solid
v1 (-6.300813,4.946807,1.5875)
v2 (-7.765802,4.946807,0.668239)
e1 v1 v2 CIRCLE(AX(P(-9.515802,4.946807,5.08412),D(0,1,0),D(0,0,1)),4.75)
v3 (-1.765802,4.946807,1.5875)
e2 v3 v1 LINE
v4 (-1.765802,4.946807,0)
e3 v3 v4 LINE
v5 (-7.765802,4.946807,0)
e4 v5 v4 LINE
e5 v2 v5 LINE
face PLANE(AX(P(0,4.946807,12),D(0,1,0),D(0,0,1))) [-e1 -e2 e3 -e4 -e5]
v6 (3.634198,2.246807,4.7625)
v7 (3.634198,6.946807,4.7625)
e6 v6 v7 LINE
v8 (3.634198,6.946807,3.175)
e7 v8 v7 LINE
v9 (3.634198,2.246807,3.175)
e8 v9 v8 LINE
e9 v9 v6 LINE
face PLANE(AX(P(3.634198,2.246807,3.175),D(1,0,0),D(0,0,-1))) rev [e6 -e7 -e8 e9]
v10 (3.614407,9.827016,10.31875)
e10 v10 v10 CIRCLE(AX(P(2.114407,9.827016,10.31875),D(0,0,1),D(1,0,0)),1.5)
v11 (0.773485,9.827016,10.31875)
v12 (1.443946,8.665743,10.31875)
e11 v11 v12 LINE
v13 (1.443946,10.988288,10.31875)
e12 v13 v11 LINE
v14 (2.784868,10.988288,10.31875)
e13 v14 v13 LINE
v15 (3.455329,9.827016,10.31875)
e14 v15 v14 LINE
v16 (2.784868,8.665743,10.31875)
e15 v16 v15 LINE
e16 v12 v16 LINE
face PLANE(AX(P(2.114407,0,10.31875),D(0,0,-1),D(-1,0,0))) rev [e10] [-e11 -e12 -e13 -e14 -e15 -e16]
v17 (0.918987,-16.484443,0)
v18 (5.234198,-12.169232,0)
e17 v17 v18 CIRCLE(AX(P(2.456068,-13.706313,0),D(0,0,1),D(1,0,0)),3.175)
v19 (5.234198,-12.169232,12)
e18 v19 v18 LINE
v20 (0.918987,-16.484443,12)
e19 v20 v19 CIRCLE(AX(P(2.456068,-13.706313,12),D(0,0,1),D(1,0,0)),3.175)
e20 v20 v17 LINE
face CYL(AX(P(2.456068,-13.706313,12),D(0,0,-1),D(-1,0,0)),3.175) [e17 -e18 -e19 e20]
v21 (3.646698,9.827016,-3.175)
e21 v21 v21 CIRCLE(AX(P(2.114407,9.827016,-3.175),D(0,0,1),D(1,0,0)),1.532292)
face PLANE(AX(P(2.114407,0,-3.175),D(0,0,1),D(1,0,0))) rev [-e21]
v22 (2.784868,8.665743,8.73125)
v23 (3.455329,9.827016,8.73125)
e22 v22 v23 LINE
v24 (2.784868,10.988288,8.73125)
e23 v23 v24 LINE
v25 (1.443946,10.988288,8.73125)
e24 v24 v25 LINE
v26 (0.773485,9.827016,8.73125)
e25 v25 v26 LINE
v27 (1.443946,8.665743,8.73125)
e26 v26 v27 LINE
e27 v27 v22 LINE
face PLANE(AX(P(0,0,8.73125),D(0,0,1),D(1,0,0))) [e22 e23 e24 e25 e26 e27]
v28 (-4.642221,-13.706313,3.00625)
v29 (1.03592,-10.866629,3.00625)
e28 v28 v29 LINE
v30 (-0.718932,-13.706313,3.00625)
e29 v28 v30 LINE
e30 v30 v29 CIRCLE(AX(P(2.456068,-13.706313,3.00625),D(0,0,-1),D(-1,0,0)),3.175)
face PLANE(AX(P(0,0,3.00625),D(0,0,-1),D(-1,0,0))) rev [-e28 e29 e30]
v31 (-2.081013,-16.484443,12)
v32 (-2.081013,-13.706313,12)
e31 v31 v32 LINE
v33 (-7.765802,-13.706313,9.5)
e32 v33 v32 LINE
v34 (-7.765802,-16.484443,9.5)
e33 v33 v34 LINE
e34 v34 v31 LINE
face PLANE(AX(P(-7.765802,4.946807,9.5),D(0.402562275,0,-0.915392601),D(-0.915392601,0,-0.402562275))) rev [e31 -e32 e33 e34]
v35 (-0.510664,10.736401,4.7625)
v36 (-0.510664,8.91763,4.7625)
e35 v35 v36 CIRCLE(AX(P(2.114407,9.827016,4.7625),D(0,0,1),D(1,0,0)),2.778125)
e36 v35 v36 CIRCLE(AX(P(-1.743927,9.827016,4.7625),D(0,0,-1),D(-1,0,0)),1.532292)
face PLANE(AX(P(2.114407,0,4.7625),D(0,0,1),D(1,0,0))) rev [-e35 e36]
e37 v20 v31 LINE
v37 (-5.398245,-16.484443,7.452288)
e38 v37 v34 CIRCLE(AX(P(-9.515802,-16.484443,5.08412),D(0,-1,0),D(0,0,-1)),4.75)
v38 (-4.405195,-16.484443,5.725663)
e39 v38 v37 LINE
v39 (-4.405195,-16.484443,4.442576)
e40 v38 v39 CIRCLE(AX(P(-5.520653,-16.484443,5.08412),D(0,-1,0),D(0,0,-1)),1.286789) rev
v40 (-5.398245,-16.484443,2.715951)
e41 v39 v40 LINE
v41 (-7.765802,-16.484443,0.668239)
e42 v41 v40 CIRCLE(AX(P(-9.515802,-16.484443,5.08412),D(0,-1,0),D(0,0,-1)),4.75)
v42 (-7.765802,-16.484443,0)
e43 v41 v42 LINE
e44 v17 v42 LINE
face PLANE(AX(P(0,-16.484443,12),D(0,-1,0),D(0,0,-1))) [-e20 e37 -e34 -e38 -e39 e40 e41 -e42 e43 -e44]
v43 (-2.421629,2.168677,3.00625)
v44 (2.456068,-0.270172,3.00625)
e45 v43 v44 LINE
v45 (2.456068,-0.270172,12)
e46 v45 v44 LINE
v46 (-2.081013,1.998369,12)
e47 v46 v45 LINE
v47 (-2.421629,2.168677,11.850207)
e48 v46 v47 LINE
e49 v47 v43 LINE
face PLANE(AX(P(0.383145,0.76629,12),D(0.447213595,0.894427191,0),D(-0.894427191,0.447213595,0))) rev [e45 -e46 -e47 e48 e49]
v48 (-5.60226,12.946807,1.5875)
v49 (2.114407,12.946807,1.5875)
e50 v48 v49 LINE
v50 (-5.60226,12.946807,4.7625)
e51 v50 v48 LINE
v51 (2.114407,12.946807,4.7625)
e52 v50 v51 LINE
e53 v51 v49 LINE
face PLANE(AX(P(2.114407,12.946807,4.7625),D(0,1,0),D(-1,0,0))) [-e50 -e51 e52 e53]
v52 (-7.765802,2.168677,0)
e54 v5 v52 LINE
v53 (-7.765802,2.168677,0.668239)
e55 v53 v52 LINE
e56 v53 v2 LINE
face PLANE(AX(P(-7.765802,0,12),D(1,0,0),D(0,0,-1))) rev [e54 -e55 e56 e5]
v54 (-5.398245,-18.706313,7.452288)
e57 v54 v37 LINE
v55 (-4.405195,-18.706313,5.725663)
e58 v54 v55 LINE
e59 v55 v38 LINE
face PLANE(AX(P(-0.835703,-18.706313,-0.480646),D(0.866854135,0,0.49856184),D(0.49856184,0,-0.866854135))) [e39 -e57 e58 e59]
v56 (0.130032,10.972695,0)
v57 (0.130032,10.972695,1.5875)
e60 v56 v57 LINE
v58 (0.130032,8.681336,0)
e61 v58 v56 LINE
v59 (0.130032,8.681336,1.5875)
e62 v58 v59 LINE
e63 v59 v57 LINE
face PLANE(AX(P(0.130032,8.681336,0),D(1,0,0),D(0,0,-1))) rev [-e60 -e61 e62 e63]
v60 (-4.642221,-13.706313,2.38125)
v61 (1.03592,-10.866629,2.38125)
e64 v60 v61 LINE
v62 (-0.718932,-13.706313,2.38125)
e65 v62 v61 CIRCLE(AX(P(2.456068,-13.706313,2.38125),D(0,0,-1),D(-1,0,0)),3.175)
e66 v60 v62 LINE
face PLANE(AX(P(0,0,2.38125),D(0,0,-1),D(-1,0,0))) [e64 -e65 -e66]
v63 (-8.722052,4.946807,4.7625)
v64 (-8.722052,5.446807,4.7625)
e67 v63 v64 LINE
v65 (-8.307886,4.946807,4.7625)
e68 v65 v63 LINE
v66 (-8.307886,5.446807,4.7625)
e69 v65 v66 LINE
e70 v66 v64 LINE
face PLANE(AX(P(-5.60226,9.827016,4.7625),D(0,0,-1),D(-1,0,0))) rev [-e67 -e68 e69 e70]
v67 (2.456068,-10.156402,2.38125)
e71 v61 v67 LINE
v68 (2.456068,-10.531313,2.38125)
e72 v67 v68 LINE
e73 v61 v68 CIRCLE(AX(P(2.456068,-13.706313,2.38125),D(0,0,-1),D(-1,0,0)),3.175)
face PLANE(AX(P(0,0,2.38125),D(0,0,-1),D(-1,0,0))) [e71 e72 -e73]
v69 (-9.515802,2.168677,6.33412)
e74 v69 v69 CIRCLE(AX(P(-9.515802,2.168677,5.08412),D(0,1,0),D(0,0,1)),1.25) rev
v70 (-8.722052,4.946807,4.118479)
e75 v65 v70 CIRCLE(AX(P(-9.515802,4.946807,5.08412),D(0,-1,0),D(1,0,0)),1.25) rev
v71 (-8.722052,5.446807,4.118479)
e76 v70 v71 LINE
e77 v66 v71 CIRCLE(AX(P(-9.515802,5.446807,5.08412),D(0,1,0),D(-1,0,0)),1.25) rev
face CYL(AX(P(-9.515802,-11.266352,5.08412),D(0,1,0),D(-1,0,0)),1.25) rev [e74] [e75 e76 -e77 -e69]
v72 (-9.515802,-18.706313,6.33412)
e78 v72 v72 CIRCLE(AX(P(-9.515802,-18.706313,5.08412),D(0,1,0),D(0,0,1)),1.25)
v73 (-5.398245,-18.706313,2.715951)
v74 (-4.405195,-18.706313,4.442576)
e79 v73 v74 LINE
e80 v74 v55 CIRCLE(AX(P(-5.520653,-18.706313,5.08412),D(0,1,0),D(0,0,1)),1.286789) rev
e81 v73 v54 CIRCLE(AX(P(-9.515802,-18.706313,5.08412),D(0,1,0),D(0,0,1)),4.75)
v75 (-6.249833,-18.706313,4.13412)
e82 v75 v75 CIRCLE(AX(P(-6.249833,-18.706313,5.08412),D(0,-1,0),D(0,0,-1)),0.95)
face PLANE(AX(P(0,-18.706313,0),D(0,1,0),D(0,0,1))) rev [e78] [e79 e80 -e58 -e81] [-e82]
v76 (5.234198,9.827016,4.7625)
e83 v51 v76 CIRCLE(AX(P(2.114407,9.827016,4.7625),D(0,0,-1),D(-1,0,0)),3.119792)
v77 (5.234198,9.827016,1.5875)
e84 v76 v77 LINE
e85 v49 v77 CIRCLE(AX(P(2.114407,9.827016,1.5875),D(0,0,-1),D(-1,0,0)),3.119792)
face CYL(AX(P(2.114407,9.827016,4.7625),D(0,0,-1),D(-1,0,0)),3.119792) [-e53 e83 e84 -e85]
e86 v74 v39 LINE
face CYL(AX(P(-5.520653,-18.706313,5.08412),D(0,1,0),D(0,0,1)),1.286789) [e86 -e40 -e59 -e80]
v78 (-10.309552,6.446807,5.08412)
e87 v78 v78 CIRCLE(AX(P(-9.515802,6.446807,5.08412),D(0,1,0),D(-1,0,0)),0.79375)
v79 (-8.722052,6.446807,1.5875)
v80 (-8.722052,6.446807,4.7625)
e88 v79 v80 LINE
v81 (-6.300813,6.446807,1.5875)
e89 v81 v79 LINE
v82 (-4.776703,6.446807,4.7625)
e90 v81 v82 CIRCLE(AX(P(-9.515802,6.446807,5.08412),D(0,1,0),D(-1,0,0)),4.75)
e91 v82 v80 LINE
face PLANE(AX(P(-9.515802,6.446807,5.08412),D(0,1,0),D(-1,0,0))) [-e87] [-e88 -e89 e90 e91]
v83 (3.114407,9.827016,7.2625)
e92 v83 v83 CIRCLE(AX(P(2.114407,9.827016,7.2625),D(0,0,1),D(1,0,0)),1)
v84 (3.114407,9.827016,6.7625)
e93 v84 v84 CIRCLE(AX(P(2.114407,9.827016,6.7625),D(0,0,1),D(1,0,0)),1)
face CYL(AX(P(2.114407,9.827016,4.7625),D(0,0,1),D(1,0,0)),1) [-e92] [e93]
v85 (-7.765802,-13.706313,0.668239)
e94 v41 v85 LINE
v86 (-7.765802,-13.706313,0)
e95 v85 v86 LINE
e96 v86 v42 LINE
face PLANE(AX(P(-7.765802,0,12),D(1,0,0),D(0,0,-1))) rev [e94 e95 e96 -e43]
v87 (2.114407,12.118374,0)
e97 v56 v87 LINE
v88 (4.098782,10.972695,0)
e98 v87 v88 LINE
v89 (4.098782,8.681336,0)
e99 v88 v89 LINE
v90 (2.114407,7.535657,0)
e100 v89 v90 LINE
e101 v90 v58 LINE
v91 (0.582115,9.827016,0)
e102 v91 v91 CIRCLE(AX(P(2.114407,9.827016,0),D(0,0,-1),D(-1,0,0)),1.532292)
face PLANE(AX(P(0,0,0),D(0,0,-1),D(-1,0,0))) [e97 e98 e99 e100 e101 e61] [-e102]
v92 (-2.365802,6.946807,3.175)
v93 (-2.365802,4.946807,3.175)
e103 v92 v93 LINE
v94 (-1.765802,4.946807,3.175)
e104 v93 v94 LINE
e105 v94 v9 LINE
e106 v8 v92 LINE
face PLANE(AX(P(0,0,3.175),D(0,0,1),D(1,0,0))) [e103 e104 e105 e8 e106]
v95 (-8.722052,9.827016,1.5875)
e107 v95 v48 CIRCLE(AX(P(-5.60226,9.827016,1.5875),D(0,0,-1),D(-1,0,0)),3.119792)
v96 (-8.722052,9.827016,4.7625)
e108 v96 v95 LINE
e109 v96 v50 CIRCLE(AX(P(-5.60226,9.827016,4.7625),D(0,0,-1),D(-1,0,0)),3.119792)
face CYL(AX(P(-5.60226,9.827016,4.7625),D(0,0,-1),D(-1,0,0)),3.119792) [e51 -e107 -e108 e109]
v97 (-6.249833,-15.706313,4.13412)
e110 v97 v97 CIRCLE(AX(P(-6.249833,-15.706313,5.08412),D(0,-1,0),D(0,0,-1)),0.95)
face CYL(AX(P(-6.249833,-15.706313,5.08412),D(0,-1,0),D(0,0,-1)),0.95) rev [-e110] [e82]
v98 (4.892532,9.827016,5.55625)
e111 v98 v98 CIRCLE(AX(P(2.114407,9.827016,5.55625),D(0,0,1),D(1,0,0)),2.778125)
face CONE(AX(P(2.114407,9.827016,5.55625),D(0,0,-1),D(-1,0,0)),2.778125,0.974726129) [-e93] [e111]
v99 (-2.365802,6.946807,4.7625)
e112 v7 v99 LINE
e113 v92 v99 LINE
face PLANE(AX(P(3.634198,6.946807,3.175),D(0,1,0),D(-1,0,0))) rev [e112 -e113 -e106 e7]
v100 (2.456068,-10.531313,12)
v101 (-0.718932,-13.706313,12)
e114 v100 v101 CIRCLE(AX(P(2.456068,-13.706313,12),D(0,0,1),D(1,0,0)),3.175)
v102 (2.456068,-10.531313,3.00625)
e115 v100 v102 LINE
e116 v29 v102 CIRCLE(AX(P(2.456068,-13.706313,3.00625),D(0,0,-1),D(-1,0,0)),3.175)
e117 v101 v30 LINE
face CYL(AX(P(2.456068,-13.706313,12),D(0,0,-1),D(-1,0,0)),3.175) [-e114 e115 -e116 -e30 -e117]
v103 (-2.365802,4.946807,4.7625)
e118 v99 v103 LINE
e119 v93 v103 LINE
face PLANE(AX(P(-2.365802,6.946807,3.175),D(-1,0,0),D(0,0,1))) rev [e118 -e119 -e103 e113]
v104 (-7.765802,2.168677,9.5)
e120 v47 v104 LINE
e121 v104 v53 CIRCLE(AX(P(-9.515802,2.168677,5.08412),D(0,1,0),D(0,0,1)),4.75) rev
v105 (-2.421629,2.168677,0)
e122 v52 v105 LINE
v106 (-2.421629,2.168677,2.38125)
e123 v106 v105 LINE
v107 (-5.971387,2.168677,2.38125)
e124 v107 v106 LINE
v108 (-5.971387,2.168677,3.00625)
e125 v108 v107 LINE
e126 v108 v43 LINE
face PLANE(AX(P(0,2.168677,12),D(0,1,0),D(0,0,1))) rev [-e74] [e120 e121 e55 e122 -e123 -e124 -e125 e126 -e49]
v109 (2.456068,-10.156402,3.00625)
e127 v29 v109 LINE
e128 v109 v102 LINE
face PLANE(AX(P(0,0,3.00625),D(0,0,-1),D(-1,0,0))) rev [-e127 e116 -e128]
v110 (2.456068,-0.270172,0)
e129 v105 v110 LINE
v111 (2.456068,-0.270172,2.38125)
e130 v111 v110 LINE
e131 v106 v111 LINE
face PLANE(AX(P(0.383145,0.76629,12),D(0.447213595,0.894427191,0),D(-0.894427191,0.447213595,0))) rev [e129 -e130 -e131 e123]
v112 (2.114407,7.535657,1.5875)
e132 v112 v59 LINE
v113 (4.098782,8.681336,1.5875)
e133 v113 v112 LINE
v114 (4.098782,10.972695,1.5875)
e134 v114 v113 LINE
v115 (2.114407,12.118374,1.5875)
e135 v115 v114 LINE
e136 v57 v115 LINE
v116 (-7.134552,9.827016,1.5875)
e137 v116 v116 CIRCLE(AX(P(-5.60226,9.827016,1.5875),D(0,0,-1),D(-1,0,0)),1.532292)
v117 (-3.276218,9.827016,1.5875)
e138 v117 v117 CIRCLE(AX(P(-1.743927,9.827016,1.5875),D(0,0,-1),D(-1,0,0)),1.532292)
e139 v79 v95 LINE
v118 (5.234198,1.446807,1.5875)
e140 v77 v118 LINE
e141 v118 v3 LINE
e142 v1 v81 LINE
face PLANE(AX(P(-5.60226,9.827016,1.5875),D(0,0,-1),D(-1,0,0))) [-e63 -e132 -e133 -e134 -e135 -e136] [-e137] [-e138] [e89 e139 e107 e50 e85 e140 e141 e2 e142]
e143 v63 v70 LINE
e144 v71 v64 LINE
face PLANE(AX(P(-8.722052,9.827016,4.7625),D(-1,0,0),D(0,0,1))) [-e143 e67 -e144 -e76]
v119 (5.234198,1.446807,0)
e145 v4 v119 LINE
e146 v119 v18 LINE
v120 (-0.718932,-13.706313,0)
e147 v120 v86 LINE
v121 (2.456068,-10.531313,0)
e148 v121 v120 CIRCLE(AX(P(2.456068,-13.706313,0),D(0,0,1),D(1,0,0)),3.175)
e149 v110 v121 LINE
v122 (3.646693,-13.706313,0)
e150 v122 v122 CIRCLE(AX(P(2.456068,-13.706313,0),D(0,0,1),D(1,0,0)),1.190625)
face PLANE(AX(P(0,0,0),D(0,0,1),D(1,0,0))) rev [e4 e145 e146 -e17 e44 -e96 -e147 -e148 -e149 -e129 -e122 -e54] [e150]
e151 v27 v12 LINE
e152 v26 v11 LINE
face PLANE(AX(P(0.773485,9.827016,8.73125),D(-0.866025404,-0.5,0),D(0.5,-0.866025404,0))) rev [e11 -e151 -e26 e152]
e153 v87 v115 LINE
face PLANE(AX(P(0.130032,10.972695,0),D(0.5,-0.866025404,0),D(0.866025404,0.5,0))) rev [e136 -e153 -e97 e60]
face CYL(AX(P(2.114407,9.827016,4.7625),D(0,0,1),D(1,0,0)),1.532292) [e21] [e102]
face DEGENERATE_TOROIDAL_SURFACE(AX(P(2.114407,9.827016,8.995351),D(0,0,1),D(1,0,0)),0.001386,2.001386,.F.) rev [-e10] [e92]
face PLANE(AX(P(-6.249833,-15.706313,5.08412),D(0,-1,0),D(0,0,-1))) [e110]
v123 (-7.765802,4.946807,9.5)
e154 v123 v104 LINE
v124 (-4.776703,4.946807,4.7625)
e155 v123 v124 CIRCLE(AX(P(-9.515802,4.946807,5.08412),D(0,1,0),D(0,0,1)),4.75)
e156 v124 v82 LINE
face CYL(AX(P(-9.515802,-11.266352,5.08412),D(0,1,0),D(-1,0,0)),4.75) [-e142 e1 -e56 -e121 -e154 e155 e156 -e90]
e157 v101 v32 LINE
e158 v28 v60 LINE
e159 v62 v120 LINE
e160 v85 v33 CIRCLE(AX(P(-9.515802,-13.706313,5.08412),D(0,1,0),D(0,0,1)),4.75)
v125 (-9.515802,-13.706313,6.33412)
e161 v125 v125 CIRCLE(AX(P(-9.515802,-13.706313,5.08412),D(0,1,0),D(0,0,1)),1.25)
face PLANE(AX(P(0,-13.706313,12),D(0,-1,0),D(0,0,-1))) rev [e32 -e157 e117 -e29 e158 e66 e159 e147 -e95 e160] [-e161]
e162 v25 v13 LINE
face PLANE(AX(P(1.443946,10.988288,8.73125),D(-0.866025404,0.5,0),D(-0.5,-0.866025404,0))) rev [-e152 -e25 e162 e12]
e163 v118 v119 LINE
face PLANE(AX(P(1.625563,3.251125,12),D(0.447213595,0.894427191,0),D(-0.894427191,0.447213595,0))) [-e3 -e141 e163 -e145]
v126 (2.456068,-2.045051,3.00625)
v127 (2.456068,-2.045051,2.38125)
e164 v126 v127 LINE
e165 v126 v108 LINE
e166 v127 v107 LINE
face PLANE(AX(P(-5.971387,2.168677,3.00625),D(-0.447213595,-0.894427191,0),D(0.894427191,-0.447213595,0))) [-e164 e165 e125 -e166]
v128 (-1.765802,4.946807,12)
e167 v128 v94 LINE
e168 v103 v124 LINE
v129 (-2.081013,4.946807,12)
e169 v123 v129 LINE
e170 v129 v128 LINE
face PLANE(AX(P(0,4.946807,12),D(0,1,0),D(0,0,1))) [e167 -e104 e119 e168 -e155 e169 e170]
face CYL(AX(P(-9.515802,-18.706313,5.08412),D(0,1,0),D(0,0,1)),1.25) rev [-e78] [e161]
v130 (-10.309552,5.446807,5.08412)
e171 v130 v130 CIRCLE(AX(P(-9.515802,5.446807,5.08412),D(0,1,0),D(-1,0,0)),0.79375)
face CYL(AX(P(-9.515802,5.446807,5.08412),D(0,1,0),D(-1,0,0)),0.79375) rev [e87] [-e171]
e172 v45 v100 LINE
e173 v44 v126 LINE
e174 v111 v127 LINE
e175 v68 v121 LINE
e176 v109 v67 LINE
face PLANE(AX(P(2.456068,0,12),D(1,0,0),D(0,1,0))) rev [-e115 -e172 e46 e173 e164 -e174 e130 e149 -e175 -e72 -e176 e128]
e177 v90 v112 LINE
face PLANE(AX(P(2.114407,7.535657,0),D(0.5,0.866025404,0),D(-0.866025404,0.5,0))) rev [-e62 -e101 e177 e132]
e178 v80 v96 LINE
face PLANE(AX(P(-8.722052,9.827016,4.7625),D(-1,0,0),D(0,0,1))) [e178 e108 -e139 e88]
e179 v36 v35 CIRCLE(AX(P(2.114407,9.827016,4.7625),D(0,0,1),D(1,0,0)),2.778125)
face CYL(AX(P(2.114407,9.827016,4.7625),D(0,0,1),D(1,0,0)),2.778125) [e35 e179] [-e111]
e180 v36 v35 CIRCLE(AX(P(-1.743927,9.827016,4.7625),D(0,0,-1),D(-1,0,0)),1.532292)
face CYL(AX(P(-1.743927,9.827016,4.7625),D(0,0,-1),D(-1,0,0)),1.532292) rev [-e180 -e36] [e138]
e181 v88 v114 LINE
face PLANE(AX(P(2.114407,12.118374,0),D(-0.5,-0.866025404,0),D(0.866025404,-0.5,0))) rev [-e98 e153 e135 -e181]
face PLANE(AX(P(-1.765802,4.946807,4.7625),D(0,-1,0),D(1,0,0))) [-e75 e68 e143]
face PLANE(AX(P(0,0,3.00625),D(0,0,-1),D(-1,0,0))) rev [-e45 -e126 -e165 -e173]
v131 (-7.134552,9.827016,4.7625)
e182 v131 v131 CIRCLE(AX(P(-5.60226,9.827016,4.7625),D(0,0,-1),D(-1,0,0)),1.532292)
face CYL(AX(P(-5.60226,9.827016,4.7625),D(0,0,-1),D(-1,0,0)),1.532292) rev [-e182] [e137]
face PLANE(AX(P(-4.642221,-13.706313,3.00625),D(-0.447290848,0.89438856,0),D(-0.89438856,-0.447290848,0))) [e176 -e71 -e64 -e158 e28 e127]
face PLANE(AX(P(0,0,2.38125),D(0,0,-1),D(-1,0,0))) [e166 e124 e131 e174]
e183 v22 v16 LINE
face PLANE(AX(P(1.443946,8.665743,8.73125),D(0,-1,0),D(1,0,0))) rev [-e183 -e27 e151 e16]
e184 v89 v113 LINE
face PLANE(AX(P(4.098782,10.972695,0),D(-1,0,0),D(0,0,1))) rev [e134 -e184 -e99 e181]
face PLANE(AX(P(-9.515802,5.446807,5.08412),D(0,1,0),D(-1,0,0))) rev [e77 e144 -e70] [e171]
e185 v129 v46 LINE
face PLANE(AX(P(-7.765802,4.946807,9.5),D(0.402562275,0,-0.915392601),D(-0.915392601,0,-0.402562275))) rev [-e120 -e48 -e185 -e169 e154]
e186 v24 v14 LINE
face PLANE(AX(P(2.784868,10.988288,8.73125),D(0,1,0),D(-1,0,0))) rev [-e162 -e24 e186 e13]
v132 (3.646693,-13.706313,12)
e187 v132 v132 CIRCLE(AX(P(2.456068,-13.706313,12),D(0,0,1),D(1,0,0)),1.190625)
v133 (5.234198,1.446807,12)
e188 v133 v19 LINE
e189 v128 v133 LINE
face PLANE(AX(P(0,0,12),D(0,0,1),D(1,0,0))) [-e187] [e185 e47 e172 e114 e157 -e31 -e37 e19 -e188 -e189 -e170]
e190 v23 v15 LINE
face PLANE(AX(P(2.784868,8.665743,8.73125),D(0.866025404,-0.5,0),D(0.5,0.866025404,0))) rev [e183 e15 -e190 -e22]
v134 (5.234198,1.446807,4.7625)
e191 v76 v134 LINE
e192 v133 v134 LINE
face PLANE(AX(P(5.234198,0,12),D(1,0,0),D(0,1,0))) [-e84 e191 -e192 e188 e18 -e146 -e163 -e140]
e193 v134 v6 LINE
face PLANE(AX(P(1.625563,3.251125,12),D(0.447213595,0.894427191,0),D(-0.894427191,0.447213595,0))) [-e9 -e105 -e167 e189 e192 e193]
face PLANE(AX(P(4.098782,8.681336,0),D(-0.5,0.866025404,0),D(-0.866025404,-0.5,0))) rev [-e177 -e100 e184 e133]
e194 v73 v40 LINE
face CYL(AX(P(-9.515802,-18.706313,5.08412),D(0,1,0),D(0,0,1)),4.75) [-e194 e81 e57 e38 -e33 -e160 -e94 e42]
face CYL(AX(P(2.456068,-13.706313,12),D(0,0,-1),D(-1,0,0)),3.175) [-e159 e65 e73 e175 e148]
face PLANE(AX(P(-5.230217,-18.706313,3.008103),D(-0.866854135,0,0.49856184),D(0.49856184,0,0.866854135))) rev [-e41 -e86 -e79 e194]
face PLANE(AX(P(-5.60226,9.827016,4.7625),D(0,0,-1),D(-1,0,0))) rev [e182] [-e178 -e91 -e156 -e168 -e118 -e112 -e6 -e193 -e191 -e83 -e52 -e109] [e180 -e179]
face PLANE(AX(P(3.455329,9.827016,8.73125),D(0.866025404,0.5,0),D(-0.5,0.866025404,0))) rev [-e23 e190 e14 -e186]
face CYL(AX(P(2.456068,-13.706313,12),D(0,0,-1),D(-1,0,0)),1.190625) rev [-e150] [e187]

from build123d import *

# Parameters (mm, degrees)
BOSS_EXTRUDE1_DEPTH             = 12
CUT_EXTRUDE1_DEPTH              = 26.760554208
SKETCH4_R                       = 4.75
SKETCH4_R_2                     = 1.25
BOSS_EXTRUDE2_DEPTH             = 1.5
BOSS_EXTRUDE2_DIRECTION_2_REACH = 28.092
BOSS_EXTRUDE3_START             = -5
BOSS_EXTRUDE3_OUTLINE_R         = 1.25
BOSS_EXTRUDE3_DEPTH             = 5
SKETCH6_R                       = 0.95
CUT_EXTRUDE2_DEPTH              = 3
BOSS_EXTRUDE4_START             = -1
SKETCH8_R                       = 1.25
SKETCH8_R_2                     = 0.79375
BOSS_EXTRUDE4_DEPTH             = 1
BOSS_EXTRUDE5_DEPTH             = 0.625
SKETCH11_R                      = 1.532291667
BOSS_EXTRUDE6_DEPTH             = 3.175
CUT_EXTRUDE3_DEPTH              = 1.5875
SKETCH13_R                      = 1.532291667
BOSS_EXTRUDE7_DEPTH             = 1.5875
CUT_EXTRUDE4_DEPTH              = 1.5875


# Read off the part's stored shape, not the designer's step: Boss-Extrude3
with BuildPart() as part:
    # Sketch1 → Boss-Extrude1 (new body)
    with BuildSketch(Plane.XY):
        with BuildLine():
            Line((-1.765801731, 4.94680722), (-7.765801731, 4.94680722))
            Line((-7.765801731, 4.94680722), (-7.765801731, 2.16867722))
            Line((-7.765801731, 2.16867722), (-2.421629262, 2.16867722))
            Line((-2.421629262, 2.16867722), (2.456068269, -0.270171545))
            Line((2.456068269, -0.270171545), (2.456068269, -10.53131278))
            ThreePointArc((2.456068269, -10.53131278), (4.06858061, -10.971275495), (5.234198269, -12.169231551))
            Line((5.234198269, -12.169231551), (5.234198269, 1.44680722))
            Line((5.234198269, 1.44680722), (-1.765801731, 4.94680722))
        make_face()
        with BuildLine():
            Line((5.234198269, -15.243394008), (5.234198269, -12.169231551))
            ThreePointArc((5.234198269, -12.169231551), (4.06858061, -10.971275495), (2.456068269, -10.53131278))
            Line((2.456068269, -10.53131278), (2.456068269, -12.51568778))
            ThreePointArc((2.456068269, -12.51568778), (3.29796728, -12.864413768), (3.646693269, -13.70631278))
            ThreePointArc((3.646693269, -13.70631278), (2.456068269, -14.89693778), (1.265443269, -13.70631278))
            Line((1.265443269, -13.70631278), (-0.718931731, -13.70631278))
            ThreePointArc((-0.718931731, -13.70631278), (-0.278969016, -15.318825121), (0.91898704, -16.48444278))
            Line((0.91898704, -16.48444278), (3.993149497, -16.48444278))
            ThreePointArc((3.993149497, -16.48444278), (4.701132299, -15.95137681), (5.234198269, -15.243394008))
        make_face()
        with BuildLine():
            Line((2.456068269, -12.51568778), (2.456068269, -10.53131278))
            ThreePointArc((2.456068269, -10.53131278), (0.211004238, -11.461248749), (-0.718931731, -13.70631278))
            Line((-0.718931731, -13.70631278), (1.265443269, -13.70631278))
            ThreePointArc((1.265443269, -13.70631278), (1.614169257, -12.864413768), (2.456068269, -12.51568778))
        make_face()
        with BuildLine():
            ThreePointArc((5.631068269, -13.70631278), (5.530250091, -12.91256778), (5.234198269, -12.169231551))
            Line((5.234198269, -12.169231551), (5.234198269, -15.243394008))
            ThreePointArc((5.234198269, -15.243394008), (5.530250091, -14.50005778), (5.631068269, -13.70631278))
        make_face()
        with BuildLine():
            ThreePointArc((0.91898704, -16.48444278), (2.456068269, -16.88131278), (3.993149497, -16.48444278))
            Line((3.993149497, -16.48444278), (0.91898704, -16.48444278))
        make_face()
        with BuildLine():
            ThreePointArc((0.91898704, -16.48444278), (-0.278969016, -15.318825121), (-0.718931731, -13.70631278))
            Line((-0.718931731, -13.70631278), (-7.765801731, -13.70631278))
            Line((-7.765801731, -13.70631278), (-7.765801731, -16.48444278))
            Line((-7.765801731, -16.48444278), (0.91898704, -16.48444278))
        make_face()
    extrude(amount=BOSS_EXTRUDE1_DEPTH)

    # Sketch3 → Cut-Extrude1 (cut, through all)
    with BuildSketch(Plane.XZ.offset(16.48444278)):
        Polygon((-7.765801731, 9.5), (-2.08101296, 12), (-7.765801731, 12), align=None)
    extrude(amount=-CUT_EXTRUDE1_DEPTH, mode=Mode.SUBTRACT)

    # Sketch4 → Boss-Extrude2 (add)
    with BuildSketch(Plane(origin=(0, 4.94680722, 0), x_dir=(1, 0, 0), z_dir=(0, 1, 0))):
        with Locations(Location((-9.515801731, -5.084119567, 0), (0, 0, 180))):
            Circle(SKETCH4_R)
        with Locations(Location((-9.515801731, -5.084119567, 0), (0, 0, 180))):
            Circle(SKETCH4_R_2, mode=Mode.SUBTRACT)
    extrude(amount=BOSS_EXTRUDE2_DEPTH)

    # Boss-Extrude2 direction 2: up to this face of the body (flat: up to its plane)
    boss_extrude2_direction_2_end = Plane(part.part.faces().sort_by_distance((-4.995668733, 2.16867722, 5.359110802))[0])
    # Sketch4 → Boss-Extrude2 direction 2 (add, up to the picked face)
    with BuildSketch(Plane(origin=(0, 4.94680722, 0), x_dir=(1, 0, 0), z_dir=(0, 1, 0)), mode=Mode.PRIVATE) as boss_extrude2_direction_2_sk1:
        with Locations(Location((-9.515801731, -5.084119567, 0), (0, 0, 180))):
            Circle(SKETCH4_R)
        with Locations(Location((-9.515801731, -5.084119567, 0), (0, 0, 180))):
            Circle(SKETCH4_R_2, mode=Mode.SUBTRACT)
    boss_extrude2_direction_2_tool1 = split(extrude(boss_extrude2_direction_2_sk1.sketch, amount=-BOSS_EXTRUDE2_DIRECTION_2_REACH, mode=Mode.PRIVATE), bisect_by=boss_extrude2_direction_2_end, keep=Keep.BOTH, mode=Mode.PRIVATE)
    add(boss_extrude2_direction_2_tool1.solids().sort_by(Axis((-4.900152, 4.946807, 5.08412), (0, -1, 0)))[0])

    # Boss-Extrude3 outline → Boss-Extrude3 (add)
    with BuildSketch(Plane(origin=(0, -13.70631278, 0), x_dir=(1, 0, 0), z_dir=(0, 1, 0)).offset(BOSS_EXTRUDE3_START)):
        with BuildLine():
            ThreePointArc((-5.39824459, -2.715950825), (-14.265801731, -5.084119567), (-5.39824459, -7.452288309))
            Line((-5.39824459, -7.452288309), (-4.405194864, -5.725663462))
            ThreePointArc((-4.405194864, -5.725663462), (-4.233864229, -5.084119567), (-4.405194864, -4.442575672))
            Line((-4.405194864, -4.442575672), (-5.39824459, -2.715950825))
        make_face()
        with Locations((-9.515801731, -5.084119567)):
            Circle(BOSS_EXTRUDE3_OUTLINE_R, mode=Mode.SUBTRACT)
    extrude(amount=BOSS_EXTRUDE3_DEPTH)

    # Sketch6 → Cut-Extrude2 (cut)
    with BuildSketch(Plane.XZ.offset(18.70631278)):
        with Locations(Location((-6.24983298, 5.084119567, 0), (0, 0, 270))):
            Circle(SKETCH6_R)
    extrude(amount=-CUT_EXTRUDE2_DEPTH, mode=Mode.SUBTRACT)

    # Sketch8 → Boss-Extrude4 (add)
    with BuildSketch(Plane(origin=(0, 6.44680722, 0), x_dir=(1, 0, 0), z_dir=(0, 1, 0)).offset(BOSS_EXTRUDE4_START)):
        with Locations(Location((-9.515801731, -5.084119567, 0), (0, 0, 180))):
            Circle(SKETCH8_R)
        with Locations(Location((-9.515801731, -5.084119567, 0), (0, 0, 180))):
            Circle(SKETCH8_R_2, mode=Mode.SUBTRACT)
    extrude(amount=BOSS_EXTRUDE4_DEPTH)

    # Sketch9 → Boss-Extrude5 (add)
    with BuildSketch(Plane(origin=(0, 0, 2.38125), x_dir=(-1, 0, 0), z_dir=(0, 0, -1))):
        Polygon((5.971387176, 2.16867722), (-2.456068269, -2.045050502), (-2.456068269, -0.270171545), (2.421629262, 2.16867722), align=None)
        Polygon((4.642221382, -13.70631278), (-2.456068269, -10.156401543), (-2.456068269, -11.535790724), (0, -13.70631278), align=None)
    extrude(amount=-BOSS_EXTRUDE5_DEPTH)

    # Sketch11 → Boss-Extrude6 (add)
    with BuildSketch(Plane(origin=(0, 0, 1.5875), x_dir=(-1, 0, 0), z_dir=(0, 0, -1))):
        with BuildLine():
            Line((-5.234198269, 1.44680722), (-5.234198269, 9.827015554))
            ThreePointArc((-5.234198269, 9.827015554), (-4.320432445, 12.033041397), (-2.114406602, 12.94680722))
            Line((-2.114406602, 12.94680722), (5.602260065, 12.94680722))
            ThreePointArc((5.602260065, 12.94680722), (7.808285908, 12.033041397), (8.722051731, 9.827015554))
            Line((8.722051731, 9.827015554), (8.722051731, 6.44680722))
            Line((8.722051731, 6.44680722), (8.722051731, 4.94680722))
            Line((8.722051731, 4.94680722), (1.765801731, 4.94680722))
            Line((1.765801731, 4.94680722), (-5.234198269, 1.44680722))
        make_face()
        with Locations((5.602260065, 9.827015554)):
            Circle(SKETCH11_R, mode=Mode.SUBTRACT)
        with Locations((1.743926731, 9.827015554)):
            Circle(SKETCH11_R, mode=Mode.SUBTRACT)
        with Locations((-2.114406602, 9.827015554)):
            Circle(SKETCH11_R, mode=Mode.SUBTRACT)
    extrude(amount=-BOSS_EXTRUDE6_DEPTH)

    # Sketch14 → Cut-Extrude3 (cut)
    with BuildSketch(Plane.XY.offset(4.7625)):
        Polygon((3.634198269, 2.24680722), (3.634198269, 6.94680722), (-2.365801731, 6.94680722), (-2.365801731, 4.94680722), (-1.765801731, 4.94680722), align=None)
    extrude(amount=-CUT_EXTRUDE3_DEPTH, mode=Mode.SUBTRACT)

    # Sketch12 → Revolve1 (revolve)
    with BuildSketch(Plane(origin=(2.114406602, 0, 0), x_dir=(0, 0, -1), z_dir=(1, 0, 0)), mode=Mode.PRIVATE) as revolve1_sk:
        with BuildLine():
            Line((-6.7625, 10.827015554), (-7.2625, 10.827015554))
            ThreePointArc((-7.2625, 10.827015554), (-8.67222129, 11.800758233), (-10.31875, 11.327015554))
            Line((-10.31875, 11.327015554), (-10.31875, 9.827015554))
            Line((-10.31875, 9.827015554), (-1.5875, 9.827015554))
            Line((-1.5875, 9.827015554), (3.175, 9.827015554))
            Line((3.175, 9.827015554), (3.175, 11.35930722))
            Line((3.175, 11.35930722), (-1.5875, 11.35930722))
            Line((-1.5875, 11.35930722), (-4.7625, 11.35930722))
            Line((-4.7625, 11.35930722), (-4.7625, 12.605140554))
            Line((-4.7625, 12.605140554), (-5.55625, 12.605140554))
            Line((-5.55625, 12.605140554), (-6.7625, 10.827015554))
        make_face()
    revolve(revolve1_sk.sketch.rotate(Axis((2.114406602, 9.827015554, 4.7625), (0, 0, -1)), 90), axis=Axis((2.114406602, 9.827015554, 4.7625), (0, 0, -1)))

    # Sketch13 → Boss-Extrude7 (add)
    with BuildSketch(Plane(origin=(0, 0, 1.5875), x_dir=(-1, 0, 0), z_dir=(0, 0, -1))):
        Polygon((-0.130031602, 10.972694994), (-2.114406602, 12.118374435), (-4.098781602, 10.972694994), (-4.098781602, 8.681336113), (-2.114406602, 7.535656673), (-0.130031602, 8.681336113), align=None)
        with Locations(Location((-2.114406602, 9.827015554, 0), (0, 0, 180))):
            Circle(SKETCH13_R, mode=Mode.SUBTRACT)
    extrude(amount=BOSS_EXTRUDE7_DEPTH)

    # Sketch15 → Cut-Extrude4 (cut)
    with BuildSketch(Plane.XY.offset(10.31875)):
        Polygon((3.455328551, 9.827015554), (2.784867577, 10.988288026), (1.443945627, 10.988288026), (0.773484653, 9.827015554), (1.443945627, 8.665743081), (2.784867577, 8.665743081), align=None)
    extrude(amount=-CUT_EXTRUDE4_DEPTH, mode=Mode.SUBTRACT)


solid = part.part
